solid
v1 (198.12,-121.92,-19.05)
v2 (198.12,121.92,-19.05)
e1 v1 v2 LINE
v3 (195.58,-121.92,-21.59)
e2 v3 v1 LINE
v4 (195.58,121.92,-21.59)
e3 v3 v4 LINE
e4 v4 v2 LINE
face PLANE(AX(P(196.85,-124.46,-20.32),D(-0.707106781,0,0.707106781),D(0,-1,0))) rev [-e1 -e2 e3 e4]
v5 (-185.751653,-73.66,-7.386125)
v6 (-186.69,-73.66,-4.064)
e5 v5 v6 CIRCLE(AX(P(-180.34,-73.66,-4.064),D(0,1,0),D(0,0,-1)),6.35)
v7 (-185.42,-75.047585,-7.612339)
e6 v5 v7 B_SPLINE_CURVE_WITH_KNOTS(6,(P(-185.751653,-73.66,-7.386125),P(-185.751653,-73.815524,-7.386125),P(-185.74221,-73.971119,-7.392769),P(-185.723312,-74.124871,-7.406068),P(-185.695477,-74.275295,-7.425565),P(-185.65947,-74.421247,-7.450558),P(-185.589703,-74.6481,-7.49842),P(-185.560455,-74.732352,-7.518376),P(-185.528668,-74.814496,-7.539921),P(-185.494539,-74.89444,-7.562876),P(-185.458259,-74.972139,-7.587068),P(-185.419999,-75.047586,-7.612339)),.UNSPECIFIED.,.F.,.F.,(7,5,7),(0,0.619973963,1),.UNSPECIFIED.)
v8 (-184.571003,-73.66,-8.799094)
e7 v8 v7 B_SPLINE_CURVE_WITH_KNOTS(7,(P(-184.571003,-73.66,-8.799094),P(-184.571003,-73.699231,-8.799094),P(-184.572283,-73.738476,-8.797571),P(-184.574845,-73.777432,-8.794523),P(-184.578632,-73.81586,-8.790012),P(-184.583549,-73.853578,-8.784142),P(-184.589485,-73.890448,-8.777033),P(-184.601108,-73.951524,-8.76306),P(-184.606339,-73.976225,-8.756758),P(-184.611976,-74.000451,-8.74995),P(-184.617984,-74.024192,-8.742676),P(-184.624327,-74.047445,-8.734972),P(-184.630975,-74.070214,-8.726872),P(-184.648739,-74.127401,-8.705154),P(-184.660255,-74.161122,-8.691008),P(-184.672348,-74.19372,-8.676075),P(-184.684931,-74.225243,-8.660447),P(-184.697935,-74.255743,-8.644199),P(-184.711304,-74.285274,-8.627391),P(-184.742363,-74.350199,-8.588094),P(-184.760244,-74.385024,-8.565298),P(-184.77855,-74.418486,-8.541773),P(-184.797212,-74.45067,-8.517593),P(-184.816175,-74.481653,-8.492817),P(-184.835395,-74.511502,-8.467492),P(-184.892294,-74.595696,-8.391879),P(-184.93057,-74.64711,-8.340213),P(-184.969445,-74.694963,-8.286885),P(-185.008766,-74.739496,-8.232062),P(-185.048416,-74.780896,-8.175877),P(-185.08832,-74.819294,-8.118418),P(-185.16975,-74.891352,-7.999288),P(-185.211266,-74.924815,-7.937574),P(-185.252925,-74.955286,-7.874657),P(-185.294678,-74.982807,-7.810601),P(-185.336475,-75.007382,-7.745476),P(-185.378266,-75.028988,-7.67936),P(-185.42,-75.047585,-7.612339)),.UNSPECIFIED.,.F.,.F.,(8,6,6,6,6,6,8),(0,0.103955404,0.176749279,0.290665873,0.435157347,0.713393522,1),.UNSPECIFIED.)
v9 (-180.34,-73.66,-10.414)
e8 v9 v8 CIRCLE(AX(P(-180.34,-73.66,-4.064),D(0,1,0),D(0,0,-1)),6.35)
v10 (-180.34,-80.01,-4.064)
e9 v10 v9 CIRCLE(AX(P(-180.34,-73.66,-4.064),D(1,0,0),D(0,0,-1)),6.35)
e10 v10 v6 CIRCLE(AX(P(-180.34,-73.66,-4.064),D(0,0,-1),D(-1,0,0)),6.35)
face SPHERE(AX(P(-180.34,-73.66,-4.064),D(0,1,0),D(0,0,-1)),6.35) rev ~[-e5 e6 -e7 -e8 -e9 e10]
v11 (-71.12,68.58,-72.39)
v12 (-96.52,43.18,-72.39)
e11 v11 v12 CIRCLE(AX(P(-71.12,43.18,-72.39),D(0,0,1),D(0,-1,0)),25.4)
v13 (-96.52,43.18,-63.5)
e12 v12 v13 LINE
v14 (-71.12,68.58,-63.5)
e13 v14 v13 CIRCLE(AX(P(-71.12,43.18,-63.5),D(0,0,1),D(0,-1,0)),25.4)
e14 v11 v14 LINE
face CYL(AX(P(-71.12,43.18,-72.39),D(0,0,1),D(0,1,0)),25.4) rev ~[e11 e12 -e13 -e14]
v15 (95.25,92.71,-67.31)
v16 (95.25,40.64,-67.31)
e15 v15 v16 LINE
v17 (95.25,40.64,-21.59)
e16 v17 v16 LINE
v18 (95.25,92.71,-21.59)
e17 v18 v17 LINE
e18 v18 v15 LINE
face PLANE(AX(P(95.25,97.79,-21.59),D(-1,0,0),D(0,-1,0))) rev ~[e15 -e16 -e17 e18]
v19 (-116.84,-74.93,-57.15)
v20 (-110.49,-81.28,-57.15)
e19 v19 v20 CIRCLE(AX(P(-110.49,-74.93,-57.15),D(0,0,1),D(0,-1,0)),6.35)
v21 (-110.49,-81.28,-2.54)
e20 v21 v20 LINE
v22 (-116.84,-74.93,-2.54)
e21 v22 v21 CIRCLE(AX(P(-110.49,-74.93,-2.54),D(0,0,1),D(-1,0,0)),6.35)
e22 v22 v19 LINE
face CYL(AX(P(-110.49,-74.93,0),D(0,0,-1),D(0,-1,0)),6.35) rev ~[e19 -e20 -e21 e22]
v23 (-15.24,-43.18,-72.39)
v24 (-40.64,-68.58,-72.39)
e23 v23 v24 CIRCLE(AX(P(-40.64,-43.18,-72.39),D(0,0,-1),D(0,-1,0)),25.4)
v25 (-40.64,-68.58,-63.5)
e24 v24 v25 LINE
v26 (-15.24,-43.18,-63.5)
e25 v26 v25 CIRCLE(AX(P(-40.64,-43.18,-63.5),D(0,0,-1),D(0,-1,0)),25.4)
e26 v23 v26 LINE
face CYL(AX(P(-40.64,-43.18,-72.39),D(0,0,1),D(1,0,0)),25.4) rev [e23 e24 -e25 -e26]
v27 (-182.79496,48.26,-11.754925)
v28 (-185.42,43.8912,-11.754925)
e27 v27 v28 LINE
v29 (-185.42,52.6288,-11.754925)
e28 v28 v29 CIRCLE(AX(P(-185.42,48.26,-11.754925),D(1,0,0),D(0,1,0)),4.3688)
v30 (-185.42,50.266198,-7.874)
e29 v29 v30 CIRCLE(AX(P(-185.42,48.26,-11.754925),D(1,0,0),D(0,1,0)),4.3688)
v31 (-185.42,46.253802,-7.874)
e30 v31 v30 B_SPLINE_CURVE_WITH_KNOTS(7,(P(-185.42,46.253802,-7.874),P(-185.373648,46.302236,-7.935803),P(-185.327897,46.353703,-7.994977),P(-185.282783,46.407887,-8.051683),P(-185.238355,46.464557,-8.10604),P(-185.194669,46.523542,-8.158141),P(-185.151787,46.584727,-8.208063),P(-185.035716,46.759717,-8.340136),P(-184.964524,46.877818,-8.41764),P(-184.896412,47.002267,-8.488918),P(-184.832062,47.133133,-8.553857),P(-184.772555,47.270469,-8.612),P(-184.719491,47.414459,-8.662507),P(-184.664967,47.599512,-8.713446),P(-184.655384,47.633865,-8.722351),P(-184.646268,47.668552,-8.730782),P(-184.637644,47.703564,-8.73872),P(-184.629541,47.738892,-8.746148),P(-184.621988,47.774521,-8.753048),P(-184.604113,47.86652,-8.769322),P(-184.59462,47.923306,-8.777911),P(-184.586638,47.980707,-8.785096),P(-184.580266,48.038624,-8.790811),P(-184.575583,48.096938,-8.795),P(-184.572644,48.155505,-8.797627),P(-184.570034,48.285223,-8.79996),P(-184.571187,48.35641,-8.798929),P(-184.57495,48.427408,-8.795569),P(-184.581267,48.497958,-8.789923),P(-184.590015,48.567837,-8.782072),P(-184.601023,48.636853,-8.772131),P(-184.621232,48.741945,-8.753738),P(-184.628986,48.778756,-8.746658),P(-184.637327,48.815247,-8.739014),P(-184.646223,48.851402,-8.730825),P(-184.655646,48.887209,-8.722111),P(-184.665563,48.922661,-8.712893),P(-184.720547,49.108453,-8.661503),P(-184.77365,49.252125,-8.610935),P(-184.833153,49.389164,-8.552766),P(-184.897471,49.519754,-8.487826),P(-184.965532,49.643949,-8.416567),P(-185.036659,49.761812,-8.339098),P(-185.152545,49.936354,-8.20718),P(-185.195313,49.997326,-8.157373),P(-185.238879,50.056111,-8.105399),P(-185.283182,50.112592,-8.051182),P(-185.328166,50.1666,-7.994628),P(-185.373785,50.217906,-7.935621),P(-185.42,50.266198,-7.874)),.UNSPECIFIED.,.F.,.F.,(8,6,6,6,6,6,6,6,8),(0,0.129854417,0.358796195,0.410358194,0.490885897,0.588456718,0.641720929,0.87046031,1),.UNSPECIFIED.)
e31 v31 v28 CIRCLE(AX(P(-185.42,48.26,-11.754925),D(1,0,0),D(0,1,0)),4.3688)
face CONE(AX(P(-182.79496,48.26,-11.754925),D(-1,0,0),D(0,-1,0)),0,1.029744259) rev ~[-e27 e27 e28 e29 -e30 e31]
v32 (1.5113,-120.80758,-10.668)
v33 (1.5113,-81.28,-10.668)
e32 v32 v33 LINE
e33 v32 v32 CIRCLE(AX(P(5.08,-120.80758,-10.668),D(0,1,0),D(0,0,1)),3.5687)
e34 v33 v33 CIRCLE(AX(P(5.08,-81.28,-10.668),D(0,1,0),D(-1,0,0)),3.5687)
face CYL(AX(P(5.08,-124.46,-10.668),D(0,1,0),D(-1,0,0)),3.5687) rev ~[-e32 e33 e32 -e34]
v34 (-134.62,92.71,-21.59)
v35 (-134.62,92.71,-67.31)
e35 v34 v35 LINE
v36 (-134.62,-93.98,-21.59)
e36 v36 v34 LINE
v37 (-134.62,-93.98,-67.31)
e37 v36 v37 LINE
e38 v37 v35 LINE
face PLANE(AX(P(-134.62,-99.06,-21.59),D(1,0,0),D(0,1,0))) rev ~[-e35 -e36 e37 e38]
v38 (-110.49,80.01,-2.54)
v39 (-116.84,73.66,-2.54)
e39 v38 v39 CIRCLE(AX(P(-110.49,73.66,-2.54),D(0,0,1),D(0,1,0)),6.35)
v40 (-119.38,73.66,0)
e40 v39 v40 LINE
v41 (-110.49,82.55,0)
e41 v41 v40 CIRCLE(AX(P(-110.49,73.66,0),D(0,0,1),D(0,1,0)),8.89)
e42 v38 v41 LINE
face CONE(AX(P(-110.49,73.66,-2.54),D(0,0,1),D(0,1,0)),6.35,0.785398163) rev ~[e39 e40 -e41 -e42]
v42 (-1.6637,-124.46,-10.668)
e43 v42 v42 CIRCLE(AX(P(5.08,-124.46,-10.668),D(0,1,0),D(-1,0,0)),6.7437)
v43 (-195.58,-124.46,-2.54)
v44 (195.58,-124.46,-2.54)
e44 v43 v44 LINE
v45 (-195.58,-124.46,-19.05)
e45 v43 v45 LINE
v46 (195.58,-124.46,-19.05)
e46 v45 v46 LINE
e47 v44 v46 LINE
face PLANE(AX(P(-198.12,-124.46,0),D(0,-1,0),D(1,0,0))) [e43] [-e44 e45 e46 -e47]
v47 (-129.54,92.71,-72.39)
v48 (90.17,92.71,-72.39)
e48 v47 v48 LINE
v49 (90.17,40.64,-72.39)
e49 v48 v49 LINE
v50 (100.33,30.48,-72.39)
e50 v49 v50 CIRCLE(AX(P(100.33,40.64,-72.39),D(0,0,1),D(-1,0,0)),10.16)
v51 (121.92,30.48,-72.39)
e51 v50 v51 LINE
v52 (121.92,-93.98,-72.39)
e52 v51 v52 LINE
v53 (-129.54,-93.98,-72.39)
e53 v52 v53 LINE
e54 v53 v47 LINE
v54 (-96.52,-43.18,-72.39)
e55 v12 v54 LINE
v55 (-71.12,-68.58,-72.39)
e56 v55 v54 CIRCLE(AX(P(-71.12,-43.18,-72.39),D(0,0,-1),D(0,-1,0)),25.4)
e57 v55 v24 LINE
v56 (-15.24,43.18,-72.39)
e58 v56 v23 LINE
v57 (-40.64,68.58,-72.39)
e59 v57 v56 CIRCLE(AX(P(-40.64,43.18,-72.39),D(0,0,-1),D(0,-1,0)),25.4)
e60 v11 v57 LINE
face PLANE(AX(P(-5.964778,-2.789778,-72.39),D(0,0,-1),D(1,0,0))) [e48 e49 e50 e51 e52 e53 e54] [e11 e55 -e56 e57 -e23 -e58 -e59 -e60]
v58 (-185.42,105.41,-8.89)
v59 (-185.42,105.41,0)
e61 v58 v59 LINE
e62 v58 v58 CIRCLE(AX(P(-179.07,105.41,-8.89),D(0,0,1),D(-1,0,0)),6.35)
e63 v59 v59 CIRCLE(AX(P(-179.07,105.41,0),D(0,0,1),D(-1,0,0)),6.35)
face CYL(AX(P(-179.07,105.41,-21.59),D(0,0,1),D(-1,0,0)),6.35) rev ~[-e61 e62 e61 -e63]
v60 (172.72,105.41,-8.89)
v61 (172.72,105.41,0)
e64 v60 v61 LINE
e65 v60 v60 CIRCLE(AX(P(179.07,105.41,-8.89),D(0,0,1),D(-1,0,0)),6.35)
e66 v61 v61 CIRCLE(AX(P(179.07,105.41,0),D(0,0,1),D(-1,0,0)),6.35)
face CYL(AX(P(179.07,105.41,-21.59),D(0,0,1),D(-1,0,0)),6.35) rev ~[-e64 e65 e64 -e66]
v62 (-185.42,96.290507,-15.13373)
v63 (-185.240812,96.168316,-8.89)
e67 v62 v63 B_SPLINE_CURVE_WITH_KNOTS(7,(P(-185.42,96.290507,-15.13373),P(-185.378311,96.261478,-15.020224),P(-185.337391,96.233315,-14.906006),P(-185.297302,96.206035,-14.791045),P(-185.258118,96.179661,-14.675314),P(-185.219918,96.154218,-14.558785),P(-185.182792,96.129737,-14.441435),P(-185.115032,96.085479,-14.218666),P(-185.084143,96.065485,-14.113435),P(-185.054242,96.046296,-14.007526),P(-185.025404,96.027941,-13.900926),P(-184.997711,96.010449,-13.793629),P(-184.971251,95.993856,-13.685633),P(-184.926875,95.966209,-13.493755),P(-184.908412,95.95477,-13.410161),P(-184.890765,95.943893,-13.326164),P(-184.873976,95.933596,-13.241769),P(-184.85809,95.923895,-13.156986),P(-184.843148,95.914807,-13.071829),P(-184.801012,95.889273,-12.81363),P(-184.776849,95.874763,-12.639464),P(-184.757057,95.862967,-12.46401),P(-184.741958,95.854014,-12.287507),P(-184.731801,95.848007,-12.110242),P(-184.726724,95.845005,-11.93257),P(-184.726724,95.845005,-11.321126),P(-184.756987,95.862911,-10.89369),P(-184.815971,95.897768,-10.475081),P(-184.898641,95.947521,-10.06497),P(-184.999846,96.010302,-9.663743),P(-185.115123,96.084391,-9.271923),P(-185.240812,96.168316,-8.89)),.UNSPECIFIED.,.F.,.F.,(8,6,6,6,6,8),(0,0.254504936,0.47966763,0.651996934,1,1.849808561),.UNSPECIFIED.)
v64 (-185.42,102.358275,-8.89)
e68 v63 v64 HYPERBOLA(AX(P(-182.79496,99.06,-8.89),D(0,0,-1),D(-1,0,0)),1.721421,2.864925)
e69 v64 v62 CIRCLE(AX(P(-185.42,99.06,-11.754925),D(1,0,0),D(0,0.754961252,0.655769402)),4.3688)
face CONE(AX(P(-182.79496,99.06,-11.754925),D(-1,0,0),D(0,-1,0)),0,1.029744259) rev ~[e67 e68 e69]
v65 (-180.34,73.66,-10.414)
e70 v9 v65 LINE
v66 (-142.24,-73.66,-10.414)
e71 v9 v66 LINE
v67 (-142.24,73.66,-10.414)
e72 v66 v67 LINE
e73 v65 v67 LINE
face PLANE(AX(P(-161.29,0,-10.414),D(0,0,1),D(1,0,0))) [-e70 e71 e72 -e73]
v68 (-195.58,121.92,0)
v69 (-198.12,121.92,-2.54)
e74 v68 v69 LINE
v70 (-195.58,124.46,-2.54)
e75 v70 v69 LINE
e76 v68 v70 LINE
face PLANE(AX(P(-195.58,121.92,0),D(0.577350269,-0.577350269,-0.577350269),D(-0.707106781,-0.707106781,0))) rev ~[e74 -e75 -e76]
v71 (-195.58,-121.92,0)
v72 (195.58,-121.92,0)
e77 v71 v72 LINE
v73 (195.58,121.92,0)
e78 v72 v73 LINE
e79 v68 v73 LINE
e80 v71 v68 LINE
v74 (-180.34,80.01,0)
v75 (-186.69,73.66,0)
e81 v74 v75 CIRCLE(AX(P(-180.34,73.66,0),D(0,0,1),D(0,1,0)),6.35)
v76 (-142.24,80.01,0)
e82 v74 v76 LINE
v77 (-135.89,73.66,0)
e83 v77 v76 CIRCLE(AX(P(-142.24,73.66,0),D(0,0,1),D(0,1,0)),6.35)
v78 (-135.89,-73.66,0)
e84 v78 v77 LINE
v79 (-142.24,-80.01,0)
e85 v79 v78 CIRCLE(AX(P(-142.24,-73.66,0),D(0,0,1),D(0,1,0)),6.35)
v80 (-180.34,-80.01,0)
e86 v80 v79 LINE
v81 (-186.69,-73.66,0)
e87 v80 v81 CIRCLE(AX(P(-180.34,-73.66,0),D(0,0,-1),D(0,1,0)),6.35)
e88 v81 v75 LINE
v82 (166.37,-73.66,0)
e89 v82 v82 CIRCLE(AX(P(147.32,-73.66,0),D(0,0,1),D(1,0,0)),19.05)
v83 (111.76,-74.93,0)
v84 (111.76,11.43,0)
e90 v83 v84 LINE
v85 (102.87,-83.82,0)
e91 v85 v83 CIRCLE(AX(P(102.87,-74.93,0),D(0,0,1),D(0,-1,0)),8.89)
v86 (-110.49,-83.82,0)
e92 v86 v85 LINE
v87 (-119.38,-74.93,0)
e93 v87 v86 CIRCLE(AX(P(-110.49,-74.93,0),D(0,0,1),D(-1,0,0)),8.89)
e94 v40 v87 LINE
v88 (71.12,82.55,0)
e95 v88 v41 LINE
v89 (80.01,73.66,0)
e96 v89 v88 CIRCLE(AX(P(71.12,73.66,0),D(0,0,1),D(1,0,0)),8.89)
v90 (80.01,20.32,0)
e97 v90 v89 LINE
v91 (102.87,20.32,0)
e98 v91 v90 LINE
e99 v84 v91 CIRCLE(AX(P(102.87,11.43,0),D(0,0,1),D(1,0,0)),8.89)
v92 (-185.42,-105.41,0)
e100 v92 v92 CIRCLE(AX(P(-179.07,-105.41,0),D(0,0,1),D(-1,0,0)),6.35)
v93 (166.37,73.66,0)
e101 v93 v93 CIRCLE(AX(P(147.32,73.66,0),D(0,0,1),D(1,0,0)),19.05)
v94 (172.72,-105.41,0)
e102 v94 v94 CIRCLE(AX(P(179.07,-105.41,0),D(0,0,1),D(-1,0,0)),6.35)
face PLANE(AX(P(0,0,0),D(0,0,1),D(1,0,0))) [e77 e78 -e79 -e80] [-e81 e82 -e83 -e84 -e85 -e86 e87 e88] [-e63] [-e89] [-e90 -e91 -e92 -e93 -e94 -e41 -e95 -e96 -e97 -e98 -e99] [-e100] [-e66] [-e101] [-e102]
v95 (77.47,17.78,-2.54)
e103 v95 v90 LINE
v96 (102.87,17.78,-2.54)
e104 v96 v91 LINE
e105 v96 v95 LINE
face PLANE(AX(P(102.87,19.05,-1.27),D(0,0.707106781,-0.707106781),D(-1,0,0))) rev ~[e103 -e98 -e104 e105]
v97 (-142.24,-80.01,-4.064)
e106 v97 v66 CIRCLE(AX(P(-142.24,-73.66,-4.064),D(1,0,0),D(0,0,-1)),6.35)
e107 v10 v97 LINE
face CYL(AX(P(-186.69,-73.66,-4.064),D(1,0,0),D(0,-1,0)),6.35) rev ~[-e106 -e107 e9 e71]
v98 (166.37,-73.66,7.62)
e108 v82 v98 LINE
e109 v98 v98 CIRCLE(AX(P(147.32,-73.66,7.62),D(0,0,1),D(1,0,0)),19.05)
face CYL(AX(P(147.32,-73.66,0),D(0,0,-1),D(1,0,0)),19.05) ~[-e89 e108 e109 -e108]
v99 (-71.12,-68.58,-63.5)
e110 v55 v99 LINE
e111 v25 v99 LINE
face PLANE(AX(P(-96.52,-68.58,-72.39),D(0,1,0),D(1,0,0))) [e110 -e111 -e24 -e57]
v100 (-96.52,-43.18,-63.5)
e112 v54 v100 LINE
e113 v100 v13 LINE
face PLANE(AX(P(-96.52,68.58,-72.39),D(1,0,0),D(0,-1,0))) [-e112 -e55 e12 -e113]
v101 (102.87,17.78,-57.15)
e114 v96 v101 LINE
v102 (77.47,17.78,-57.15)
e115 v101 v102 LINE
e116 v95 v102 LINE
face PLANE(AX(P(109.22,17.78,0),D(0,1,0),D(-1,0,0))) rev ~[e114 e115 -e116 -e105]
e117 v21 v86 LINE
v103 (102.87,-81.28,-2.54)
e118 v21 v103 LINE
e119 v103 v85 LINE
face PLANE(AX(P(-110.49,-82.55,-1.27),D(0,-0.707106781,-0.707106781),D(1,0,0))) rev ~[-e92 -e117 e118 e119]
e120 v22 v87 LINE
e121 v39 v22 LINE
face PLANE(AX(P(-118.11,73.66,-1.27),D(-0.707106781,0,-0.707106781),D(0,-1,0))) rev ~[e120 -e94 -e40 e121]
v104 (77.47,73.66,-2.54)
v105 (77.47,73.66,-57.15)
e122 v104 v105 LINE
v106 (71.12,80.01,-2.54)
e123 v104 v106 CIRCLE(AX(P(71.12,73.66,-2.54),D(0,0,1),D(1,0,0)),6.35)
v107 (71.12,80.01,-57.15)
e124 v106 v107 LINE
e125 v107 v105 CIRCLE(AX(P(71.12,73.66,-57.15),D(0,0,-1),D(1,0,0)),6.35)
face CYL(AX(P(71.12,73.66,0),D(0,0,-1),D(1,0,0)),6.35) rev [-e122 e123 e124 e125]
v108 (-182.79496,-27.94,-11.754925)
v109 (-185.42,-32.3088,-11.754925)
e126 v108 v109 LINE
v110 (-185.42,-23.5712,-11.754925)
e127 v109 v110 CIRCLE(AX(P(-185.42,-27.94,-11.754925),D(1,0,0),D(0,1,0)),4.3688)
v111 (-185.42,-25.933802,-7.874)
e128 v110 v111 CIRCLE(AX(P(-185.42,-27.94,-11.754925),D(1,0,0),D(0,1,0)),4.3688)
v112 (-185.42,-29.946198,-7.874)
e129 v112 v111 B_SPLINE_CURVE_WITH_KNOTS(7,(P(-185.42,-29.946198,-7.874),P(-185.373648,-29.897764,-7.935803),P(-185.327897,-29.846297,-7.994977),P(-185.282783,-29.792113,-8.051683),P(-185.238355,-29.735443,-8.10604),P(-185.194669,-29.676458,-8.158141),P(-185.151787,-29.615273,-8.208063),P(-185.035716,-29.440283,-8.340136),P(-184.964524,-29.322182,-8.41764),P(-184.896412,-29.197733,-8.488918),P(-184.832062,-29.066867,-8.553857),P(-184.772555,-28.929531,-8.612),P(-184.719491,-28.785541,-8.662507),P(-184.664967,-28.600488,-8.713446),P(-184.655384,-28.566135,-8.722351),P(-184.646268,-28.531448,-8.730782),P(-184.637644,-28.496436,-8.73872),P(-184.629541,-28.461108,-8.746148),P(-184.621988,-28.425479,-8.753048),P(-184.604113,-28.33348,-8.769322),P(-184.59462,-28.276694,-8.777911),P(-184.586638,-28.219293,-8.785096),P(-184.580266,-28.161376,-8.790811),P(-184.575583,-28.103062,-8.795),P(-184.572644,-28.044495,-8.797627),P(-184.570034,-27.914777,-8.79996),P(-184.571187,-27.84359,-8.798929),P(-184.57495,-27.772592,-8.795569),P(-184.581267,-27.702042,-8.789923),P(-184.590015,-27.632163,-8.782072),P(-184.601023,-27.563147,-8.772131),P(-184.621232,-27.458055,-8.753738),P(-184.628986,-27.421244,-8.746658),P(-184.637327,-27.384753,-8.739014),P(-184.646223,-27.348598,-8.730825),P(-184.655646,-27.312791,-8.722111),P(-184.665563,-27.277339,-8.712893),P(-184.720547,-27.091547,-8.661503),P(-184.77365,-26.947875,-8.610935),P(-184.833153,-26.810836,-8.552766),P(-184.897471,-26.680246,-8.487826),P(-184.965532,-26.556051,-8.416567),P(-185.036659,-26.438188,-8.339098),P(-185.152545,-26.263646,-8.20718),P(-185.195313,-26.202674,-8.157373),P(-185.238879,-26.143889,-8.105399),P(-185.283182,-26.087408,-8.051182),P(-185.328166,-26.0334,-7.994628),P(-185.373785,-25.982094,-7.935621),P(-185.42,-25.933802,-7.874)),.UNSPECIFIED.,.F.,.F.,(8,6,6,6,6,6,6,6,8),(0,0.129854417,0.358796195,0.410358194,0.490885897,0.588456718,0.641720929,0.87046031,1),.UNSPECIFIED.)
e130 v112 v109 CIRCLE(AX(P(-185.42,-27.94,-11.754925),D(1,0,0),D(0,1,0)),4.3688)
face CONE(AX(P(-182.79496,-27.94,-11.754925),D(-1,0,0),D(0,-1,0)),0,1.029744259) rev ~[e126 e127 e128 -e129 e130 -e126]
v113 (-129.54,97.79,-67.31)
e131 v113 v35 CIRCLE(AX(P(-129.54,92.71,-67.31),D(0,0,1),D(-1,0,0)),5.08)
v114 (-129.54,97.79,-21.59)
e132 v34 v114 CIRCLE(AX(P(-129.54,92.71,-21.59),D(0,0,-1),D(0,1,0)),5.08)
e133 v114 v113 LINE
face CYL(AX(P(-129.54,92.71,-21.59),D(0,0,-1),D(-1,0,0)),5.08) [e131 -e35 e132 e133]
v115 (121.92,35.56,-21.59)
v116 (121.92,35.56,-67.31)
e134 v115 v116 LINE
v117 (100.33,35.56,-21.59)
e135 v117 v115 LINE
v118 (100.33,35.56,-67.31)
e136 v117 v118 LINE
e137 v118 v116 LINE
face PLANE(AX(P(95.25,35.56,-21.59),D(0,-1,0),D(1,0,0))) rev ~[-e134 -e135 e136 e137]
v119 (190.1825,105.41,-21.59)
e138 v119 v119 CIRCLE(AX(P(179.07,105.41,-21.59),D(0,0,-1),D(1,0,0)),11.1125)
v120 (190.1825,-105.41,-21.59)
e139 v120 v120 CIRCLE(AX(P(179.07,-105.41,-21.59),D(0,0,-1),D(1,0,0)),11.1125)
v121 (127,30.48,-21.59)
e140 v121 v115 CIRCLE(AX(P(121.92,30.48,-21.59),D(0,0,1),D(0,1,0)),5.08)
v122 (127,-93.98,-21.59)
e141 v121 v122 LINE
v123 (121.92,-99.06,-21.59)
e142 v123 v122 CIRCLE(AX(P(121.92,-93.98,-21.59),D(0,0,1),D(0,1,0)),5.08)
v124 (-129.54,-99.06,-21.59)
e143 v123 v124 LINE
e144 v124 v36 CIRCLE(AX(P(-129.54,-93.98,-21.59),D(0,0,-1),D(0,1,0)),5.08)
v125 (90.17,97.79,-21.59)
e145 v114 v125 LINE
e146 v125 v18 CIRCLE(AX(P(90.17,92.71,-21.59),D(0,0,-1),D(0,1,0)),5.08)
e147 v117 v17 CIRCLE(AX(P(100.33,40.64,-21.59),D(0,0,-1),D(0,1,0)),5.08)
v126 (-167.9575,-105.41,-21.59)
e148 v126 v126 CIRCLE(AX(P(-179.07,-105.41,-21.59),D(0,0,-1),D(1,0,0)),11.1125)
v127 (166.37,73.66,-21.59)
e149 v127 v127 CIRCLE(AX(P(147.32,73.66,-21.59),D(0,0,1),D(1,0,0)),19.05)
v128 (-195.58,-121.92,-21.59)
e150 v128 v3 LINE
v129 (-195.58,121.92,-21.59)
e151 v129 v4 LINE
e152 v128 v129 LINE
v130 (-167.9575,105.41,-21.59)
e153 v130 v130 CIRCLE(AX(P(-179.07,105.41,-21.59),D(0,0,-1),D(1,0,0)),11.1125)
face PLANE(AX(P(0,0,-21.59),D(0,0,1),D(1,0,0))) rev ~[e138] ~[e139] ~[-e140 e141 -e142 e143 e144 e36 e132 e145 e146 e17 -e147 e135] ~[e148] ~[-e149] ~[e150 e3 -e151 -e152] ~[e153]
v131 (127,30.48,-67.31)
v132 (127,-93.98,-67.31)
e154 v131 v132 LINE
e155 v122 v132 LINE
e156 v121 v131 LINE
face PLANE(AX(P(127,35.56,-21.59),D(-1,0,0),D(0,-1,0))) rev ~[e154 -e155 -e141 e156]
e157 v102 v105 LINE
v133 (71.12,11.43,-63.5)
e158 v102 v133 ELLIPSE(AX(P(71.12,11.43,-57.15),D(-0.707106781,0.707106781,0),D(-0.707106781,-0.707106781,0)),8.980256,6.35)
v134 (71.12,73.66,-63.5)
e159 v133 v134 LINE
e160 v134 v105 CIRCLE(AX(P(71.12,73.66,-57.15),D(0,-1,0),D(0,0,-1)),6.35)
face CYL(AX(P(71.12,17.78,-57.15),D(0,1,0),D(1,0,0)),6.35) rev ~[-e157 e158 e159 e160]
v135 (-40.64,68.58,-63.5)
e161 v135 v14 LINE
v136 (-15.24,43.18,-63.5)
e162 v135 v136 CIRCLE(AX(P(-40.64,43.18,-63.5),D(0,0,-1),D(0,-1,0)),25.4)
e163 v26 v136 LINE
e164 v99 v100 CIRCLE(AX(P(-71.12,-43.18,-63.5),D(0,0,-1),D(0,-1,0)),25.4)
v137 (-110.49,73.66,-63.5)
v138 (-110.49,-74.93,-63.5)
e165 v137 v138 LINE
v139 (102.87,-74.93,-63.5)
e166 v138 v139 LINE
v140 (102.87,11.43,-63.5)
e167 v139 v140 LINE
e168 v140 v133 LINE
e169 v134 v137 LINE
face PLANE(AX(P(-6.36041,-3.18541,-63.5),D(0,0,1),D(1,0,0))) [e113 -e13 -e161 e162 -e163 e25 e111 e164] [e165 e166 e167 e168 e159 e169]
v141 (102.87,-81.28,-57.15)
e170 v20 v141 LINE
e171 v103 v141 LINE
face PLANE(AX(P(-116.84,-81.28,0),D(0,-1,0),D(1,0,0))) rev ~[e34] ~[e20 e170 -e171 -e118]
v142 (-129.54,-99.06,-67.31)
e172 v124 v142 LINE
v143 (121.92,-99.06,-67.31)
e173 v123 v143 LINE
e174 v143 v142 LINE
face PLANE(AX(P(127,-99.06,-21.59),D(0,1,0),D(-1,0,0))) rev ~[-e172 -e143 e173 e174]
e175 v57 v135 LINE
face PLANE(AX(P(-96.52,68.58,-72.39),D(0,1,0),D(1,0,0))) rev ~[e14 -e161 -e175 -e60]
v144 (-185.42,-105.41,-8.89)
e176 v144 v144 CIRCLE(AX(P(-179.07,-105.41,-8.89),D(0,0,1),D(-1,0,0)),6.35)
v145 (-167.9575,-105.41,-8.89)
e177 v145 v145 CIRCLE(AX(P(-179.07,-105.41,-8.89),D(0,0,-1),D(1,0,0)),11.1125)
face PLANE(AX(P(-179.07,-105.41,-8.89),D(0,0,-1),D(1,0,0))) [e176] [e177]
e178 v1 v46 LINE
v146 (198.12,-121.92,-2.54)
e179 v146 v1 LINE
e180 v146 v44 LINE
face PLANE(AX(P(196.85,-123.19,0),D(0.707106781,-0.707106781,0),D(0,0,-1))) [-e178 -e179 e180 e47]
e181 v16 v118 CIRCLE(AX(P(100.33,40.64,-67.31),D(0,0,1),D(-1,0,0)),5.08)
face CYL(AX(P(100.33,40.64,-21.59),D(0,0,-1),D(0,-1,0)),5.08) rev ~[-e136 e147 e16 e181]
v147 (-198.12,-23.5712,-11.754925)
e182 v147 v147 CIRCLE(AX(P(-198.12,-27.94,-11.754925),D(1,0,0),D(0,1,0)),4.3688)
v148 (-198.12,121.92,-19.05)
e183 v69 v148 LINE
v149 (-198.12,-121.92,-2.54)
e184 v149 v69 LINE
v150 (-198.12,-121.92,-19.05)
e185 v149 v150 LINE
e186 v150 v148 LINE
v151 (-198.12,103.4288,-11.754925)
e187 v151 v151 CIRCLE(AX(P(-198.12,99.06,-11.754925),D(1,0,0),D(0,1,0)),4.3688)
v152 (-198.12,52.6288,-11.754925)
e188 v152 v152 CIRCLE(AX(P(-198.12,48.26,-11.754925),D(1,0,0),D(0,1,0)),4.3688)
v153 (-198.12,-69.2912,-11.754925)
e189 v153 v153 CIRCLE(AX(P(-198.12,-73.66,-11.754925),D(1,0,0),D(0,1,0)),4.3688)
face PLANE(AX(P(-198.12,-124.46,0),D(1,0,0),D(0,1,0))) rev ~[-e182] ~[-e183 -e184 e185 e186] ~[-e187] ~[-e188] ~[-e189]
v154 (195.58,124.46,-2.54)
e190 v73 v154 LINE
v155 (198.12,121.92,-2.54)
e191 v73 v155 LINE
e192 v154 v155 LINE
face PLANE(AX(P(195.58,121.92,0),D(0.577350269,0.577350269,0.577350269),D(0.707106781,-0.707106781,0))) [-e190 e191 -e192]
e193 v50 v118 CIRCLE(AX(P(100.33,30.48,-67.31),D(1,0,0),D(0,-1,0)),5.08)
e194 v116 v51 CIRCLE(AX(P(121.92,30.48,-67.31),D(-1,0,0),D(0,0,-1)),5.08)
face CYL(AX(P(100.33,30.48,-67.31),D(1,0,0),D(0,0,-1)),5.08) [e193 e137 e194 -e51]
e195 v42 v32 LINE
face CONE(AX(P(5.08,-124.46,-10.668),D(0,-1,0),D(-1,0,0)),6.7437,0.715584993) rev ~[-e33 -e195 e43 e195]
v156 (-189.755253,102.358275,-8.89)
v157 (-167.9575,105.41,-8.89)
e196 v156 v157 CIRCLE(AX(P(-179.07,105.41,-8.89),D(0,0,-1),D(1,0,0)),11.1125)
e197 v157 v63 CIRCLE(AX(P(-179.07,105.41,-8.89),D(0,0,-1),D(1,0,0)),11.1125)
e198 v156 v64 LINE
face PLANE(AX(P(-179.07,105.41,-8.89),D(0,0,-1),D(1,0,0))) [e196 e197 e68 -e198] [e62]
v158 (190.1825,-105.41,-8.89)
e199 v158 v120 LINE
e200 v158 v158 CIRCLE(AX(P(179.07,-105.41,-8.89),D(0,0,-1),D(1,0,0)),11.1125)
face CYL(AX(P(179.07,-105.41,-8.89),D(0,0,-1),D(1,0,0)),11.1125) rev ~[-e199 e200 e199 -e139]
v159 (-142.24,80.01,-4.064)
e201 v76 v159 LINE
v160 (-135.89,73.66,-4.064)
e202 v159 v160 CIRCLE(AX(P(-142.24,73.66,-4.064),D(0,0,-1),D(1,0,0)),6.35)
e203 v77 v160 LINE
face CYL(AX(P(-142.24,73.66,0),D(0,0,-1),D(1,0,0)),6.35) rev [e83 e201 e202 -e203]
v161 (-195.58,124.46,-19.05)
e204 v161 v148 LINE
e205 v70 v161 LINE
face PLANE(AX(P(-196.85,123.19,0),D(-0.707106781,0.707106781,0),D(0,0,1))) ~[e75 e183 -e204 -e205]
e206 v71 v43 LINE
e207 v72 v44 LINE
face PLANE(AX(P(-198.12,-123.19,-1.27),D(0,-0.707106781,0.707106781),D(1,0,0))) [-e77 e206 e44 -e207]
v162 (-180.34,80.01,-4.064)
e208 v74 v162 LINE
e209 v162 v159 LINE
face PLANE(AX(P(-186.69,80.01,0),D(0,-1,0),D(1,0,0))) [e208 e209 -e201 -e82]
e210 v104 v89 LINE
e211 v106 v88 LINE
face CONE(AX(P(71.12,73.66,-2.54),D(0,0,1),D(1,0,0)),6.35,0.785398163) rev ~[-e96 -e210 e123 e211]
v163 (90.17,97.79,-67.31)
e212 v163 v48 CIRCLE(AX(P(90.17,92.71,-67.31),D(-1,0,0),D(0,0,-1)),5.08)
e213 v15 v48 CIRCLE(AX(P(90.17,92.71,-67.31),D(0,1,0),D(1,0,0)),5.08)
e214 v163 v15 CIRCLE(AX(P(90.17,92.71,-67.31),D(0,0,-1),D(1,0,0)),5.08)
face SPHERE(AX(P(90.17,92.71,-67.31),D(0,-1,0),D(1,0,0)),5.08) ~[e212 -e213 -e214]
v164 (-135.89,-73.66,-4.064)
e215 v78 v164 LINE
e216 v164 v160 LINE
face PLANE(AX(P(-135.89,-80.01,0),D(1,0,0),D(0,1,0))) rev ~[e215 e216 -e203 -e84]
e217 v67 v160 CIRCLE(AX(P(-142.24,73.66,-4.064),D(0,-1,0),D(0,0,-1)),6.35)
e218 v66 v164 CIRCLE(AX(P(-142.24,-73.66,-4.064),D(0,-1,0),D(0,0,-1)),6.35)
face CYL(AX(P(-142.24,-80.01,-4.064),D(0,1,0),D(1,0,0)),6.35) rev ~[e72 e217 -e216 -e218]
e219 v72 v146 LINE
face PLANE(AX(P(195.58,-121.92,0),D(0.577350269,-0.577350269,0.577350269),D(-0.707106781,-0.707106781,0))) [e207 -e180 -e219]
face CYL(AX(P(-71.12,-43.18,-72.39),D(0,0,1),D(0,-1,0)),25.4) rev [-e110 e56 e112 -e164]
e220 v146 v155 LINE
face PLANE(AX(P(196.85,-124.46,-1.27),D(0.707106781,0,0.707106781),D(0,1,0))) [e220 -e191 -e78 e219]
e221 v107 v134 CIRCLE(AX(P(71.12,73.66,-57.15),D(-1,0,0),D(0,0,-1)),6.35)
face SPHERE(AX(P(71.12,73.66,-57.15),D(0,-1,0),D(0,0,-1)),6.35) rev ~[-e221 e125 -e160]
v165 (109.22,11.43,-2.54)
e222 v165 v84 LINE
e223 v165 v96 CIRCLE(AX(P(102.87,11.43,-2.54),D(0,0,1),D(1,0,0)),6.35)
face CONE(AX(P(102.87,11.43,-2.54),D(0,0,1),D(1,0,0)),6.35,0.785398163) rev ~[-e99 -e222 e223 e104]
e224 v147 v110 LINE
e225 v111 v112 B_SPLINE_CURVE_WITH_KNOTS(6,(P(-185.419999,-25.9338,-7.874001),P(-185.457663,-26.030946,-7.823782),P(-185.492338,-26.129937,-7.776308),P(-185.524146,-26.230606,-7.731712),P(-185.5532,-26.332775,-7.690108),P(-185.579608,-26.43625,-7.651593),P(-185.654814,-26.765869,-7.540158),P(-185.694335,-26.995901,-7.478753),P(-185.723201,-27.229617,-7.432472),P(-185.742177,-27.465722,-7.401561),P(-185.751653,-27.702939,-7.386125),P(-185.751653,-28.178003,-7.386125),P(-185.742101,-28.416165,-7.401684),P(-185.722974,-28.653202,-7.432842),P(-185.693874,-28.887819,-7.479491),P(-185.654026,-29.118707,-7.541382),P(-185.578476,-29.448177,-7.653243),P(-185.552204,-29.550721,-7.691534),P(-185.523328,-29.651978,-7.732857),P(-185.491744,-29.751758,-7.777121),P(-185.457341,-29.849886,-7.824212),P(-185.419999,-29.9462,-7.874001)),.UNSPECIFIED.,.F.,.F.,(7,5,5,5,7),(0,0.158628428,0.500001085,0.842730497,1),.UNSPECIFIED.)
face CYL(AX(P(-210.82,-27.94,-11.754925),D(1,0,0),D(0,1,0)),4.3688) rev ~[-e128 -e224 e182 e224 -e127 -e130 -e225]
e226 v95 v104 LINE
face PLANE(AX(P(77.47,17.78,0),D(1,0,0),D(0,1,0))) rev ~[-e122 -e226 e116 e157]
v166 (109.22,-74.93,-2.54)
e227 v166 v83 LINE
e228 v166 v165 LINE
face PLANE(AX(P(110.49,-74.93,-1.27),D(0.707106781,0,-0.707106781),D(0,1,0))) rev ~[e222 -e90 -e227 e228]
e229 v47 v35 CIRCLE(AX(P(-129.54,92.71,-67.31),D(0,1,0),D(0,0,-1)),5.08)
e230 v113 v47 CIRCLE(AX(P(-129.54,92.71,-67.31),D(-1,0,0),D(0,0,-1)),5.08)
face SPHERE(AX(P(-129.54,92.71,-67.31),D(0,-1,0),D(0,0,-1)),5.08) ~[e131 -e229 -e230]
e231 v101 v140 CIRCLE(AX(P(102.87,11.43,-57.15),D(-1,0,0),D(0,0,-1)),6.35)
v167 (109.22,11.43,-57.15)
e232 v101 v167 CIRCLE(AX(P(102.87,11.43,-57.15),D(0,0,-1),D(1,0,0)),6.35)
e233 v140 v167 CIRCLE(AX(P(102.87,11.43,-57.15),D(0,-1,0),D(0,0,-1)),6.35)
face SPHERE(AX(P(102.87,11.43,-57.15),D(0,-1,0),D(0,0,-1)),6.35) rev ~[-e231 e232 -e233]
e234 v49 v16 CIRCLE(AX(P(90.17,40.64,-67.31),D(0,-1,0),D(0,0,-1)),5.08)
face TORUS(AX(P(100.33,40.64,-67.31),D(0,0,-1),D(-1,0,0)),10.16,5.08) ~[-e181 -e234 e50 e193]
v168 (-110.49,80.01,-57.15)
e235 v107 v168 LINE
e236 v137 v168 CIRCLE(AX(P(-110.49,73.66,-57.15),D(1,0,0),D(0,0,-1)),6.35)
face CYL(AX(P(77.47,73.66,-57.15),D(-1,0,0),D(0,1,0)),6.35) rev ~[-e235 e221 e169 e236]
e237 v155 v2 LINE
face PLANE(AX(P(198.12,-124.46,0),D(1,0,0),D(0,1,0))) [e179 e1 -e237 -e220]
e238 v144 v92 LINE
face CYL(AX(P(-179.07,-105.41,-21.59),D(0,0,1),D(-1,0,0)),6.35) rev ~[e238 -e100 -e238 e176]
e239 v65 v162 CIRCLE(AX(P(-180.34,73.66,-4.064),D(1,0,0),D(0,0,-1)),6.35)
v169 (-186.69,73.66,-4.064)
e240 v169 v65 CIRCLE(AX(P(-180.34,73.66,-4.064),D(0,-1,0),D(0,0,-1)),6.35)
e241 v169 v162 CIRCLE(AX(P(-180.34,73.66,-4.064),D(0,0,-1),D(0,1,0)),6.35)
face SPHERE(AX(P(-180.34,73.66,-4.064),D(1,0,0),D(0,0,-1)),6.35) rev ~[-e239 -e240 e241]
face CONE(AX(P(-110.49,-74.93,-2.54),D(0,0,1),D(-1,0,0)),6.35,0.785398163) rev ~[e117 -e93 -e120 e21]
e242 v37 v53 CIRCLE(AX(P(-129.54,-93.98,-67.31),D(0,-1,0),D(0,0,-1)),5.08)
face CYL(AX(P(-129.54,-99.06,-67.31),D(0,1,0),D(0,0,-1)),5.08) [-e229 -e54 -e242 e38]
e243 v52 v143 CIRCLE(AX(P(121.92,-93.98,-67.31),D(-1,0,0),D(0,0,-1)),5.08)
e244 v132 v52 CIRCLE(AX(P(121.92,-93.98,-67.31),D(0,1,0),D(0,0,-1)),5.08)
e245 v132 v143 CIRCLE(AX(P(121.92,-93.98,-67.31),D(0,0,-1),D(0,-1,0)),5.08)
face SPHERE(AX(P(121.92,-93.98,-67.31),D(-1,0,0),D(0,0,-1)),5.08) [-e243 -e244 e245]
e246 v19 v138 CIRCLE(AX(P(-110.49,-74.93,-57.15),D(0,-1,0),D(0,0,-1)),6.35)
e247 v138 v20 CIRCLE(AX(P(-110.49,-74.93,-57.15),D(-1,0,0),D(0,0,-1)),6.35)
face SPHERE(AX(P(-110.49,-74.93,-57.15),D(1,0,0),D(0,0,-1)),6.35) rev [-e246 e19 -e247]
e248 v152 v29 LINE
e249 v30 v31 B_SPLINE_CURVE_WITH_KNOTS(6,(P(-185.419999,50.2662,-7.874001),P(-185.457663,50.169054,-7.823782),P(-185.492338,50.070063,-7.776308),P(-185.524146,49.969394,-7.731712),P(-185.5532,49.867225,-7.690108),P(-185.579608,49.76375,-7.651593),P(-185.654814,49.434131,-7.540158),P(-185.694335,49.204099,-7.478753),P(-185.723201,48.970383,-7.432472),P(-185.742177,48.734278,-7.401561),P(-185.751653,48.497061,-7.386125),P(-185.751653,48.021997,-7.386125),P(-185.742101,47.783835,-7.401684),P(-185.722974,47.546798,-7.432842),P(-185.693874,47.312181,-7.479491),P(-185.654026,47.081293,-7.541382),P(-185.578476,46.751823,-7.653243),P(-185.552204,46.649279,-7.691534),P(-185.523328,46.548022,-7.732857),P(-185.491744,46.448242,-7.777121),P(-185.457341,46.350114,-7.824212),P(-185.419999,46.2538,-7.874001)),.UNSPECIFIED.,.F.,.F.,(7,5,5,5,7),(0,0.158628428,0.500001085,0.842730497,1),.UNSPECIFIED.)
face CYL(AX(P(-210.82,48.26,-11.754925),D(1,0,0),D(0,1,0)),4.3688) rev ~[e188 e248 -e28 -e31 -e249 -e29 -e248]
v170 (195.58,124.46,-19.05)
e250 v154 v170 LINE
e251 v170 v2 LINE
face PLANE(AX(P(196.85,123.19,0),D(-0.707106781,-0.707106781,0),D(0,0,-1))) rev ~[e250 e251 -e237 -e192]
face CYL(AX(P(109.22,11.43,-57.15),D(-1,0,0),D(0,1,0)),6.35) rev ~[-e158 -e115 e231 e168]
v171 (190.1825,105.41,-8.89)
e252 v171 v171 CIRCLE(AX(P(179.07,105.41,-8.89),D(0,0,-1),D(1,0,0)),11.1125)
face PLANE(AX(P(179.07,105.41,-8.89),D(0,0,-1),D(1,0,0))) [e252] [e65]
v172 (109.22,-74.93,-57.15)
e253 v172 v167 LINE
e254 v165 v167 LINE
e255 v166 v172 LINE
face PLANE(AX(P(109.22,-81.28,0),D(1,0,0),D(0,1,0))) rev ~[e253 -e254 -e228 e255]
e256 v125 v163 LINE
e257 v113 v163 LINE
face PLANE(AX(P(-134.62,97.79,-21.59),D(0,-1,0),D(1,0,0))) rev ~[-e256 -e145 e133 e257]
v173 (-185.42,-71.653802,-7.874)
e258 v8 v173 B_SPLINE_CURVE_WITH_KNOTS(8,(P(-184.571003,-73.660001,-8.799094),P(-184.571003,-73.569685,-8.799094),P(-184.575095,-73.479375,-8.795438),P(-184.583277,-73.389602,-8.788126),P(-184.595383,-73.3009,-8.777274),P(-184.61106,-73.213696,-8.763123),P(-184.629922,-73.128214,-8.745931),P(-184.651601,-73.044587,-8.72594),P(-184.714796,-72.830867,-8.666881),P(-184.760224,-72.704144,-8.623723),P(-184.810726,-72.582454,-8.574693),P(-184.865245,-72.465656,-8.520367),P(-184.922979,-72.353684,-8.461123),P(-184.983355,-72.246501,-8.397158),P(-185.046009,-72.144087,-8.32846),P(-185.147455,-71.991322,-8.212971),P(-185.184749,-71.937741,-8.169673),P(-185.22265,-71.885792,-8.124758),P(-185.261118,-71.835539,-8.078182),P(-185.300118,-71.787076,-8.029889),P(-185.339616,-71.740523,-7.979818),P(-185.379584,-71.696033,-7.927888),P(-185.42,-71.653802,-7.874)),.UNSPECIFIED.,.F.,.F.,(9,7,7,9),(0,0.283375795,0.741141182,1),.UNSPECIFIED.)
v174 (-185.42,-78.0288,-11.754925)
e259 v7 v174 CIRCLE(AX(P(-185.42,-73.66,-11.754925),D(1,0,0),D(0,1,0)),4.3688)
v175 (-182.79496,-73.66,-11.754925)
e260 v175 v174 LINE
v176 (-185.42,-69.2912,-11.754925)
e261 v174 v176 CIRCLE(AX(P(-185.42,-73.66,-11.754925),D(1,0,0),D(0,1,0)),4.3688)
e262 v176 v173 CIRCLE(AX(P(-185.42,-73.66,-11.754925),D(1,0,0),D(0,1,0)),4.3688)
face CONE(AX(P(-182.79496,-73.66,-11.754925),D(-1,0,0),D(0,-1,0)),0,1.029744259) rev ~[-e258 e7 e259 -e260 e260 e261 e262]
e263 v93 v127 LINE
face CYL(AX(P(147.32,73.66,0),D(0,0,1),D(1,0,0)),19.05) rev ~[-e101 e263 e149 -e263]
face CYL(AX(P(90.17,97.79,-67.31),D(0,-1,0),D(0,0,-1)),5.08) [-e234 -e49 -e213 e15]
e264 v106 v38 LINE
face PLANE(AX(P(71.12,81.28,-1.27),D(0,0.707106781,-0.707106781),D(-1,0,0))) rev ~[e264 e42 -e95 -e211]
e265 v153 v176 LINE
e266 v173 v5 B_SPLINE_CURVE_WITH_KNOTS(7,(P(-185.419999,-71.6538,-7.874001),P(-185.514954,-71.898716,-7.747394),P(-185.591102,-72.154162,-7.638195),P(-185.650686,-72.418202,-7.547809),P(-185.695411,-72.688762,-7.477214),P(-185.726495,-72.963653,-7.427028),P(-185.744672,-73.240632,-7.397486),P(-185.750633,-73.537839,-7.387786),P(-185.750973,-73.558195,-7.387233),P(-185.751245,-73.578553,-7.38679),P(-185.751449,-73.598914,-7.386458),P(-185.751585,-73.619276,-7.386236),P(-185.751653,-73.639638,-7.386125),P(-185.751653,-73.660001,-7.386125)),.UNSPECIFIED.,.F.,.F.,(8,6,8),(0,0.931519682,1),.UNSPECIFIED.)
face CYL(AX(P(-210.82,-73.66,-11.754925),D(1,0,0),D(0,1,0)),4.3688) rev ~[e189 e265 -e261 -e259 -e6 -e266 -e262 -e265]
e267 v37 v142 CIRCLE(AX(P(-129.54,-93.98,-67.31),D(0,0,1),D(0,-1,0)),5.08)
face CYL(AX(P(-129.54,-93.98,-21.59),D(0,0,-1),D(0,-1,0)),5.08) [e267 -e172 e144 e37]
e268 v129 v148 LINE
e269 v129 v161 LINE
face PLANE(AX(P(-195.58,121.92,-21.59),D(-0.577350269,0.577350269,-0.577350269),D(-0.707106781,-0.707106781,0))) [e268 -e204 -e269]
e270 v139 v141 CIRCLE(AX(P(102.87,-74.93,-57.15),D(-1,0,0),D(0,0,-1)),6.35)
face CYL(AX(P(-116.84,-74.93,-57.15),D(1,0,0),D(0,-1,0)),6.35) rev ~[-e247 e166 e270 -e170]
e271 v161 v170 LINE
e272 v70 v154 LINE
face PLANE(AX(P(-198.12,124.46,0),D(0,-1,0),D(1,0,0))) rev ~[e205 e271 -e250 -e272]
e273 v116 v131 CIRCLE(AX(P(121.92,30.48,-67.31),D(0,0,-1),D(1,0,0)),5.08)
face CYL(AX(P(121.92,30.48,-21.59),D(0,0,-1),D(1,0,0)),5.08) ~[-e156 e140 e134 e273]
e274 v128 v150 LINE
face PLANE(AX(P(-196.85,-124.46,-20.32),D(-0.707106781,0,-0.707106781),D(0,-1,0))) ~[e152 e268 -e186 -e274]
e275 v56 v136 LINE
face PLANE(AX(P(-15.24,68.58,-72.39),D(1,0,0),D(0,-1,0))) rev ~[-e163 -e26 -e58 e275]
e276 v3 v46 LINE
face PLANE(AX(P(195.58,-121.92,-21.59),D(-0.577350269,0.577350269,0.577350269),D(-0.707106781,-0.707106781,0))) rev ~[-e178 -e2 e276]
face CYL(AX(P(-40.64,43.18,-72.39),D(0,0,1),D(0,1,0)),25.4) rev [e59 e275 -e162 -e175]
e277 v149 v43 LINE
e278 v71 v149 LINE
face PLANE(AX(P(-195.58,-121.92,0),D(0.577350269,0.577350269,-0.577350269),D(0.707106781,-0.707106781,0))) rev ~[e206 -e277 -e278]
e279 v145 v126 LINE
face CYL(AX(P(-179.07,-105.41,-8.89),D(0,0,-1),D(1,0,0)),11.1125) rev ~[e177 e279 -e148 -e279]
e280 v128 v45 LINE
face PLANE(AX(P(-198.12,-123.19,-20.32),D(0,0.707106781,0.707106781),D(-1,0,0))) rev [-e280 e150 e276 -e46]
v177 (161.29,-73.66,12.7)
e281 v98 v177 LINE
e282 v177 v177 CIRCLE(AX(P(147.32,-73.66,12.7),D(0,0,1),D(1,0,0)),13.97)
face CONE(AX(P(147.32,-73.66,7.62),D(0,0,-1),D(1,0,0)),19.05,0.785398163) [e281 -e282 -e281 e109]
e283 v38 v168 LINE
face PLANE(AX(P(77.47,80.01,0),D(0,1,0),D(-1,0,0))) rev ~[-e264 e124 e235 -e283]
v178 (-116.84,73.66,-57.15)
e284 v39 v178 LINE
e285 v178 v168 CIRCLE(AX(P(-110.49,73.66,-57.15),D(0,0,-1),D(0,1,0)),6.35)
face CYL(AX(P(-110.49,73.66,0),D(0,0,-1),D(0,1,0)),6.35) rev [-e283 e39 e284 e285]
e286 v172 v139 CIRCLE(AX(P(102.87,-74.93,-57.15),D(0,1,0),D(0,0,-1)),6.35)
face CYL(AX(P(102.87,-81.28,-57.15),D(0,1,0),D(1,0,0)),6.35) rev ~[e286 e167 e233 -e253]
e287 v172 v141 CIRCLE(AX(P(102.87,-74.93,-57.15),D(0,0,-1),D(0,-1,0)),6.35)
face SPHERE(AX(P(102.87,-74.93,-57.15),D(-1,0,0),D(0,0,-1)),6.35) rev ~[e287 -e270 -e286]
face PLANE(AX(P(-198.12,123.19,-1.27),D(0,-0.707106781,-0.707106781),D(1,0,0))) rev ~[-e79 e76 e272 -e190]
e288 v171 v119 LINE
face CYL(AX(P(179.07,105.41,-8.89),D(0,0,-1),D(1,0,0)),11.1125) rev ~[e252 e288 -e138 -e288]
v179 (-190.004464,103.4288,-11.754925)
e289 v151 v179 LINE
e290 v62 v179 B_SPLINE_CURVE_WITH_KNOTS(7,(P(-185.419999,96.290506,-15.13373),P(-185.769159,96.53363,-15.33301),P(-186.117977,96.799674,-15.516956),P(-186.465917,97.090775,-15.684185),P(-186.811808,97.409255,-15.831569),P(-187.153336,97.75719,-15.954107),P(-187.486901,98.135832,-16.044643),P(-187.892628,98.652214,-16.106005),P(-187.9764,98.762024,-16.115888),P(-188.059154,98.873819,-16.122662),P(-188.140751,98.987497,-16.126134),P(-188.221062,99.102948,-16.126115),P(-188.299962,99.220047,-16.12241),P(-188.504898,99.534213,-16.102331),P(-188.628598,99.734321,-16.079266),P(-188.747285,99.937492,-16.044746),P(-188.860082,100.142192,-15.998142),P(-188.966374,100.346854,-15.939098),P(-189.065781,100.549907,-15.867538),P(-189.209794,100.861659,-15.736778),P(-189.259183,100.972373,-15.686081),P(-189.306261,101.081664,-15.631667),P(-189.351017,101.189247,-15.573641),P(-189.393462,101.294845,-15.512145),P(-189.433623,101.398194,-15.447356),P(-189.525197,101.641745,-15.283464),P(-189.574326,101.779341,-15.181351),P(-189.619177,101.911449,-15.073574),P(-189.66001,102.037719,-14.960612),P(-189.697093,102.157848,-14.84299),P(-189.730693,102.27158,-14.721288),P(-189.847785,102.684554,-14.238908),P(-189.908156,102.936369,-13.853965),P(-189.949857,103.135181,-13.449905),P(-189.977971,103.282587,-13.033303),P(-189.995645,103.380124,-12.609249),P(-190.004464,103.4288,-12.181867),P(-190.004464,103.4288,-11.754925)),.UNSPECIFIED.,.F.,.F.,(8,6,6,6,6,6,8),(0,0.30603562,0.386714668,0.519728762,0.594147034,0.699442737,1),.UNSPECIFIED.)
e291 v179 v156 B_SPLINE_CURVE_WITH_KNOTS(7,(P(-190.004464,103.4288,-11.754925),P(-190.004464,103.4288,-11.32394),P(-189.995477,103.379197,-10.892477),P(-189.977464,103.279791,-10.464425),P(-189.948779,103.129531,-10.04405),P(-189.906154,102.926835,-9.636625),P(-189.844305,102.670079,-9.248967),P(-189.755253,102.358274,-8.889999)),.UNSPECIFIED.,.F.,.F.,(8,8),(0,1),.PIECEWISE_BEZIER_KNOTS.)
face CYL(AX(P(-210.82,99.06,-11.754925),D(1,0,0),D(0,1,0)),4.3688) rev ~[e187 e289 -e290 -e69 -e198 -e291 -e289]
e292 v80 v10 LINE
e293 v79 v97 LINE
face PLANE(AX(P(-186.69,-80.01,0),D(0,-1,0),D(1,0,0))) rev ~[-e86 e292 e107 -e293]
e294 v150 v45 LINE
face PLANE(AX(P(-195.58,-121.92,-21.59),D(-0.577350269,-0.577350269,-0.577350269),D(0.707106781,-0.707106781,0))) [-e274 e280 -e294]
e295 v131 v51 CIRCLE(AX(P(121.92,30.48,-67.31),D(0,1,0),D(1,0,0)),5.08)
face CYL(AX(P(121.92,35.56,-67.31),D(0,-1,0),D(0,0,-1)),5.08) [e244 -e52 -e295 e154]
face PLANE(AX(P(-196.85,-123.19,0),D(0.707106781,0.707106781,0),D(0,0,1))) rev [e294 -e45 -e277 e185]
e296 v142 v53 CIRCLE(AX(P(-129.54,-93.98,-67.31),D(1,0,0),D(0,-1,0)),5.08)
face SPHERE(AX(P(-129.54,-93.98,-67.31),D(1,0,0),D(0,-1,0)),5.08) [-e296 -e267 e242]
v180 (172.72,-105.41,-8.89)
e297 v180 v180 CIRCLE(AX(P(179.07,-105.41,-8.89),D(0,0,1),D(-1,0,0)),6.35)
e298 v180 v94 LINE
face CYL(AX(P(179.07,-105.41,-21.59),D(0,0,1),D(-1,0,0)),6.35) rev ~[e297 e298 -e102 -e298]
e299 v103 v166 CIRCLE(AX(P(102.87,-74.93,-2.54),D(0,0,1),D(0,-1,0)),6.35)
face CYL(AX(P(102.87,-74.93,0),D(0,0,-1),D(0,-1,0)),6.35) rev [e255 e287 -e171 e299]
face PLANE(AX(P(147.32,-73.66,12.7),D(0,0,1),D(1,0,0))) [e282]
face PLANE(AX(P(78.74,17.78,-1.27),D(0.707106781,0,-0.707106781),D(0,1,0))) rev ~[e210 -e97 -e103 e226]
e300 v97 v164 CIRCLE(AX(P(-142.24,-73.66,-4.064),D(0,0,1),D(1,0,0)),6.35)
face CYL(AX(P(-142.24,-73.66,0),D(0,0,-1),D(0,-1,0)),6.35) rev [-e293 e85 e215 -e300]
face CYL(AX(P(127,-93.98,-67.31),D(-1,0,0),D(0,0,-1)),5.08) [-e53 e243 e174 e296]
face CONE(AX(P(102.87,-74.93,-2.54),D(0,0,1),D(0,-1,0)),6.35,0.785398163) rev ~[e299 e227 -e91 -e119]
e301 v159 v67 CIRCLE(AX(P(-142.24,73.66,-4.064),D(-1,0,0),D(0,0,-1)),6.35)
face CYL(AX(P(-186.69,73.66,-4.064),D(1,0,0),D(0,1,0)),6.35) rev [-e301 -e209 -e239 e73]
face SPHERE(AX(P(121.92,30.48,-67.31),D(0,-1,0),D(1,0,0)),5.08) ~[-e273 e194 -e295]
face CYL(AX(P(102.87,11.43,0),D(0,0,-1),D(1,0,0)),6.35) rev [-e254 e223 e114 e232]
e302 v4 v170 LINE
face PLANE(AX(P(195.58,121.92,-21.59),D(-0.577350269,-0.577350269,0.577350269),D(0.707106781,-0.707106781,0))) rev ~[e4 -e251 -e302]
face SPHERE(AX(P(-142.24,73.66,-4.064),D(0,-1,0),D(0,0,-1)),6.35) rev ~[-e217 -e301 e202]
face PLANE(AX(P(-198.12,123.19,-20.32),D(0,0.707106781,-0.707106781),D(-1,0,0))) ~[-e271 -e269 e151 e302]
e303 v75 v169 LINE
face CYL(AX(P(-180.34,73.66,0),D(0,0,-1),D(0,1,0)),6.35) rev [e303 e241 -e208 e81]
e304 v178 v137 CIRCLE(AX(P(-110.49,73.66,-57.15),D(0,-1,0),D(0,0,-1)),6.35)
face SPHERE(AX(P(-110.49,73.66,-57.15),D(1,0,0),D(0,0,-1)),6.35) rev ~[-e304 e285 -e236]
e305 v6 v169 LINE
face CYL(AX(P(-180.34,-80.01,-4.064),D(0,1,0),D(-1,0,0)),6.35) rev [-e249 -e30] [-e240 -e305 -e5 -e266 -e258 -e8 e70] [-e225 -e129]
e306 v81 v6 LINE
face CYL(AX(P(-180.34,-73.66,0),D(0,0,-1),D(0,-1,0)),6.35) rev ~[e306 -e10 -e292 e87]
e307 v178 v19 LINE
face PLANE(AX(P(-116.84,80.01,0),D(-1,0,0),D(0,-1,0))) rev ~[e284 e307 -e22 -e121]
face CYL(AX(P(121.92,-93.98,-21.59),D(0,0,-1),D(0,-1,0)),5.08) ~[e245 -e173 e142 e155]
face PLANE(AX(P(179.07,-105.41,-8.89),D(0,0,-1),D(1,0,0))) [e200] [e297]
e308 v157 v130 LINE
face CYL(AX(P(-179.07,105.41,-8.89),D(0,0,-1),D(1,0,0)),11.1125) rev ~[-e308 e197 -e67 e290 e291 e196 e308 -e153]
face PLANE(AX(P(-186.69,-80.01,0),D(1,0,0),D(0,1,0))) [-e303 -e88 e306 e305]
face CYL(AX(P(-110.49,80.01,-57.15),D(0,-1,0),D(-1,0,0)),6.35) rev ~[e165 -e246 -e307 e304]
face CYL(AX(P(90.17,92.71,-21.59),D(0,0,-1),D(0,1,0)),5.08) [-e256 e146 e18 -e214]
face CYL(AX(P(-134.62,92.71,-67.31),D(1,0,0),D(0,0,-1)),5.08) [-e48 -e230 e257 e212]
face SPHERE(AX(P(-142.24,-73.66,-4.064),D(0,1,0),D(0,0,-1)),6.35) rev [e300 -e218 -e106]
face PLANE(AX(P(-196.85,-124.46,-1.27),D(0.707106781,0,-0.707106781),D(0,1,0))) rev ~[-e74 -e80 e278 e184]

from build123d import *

# Parameters (mm, degrees)
F0_W            = 396.24
F0_H            = 248.92
F1_DEPTH        = 21.59
F3_DEPTH        = 50.8
F5_DEPTH        = 63.5
F6_R            = 6.35
F7_R            = 5.08
F8_W            = 81.28
F8_H            = 137.16
F9_DEPTH        = 72.391
F10_W           = 50.8
F10_H           = 160.02
F11_DEPTH       = 10.414
F12_R           = 6.35
F13_R           = 19.05
F14_DEPTH       = 12.7
F15_SIZE        = 5.08
F17_D           = 7.1374
F17_DEPTH       = 127
F17_CSINK_D     = 13.4874
F17_CSINK_ANGLE = 82
F17_TIP         = 2.1442912911
F18_R           = 5.08
F20_D           = 12.7
F20_CBORE_D     = 22.225
F20_CBORE_DEPTH = 12.7
F21_R           = 19.05
F22_DEPTH       = 72.391
F24_SIZE        = 2.54
F25_R           = 25.4
F26_D           = 8.7376
F26_DEPTH       = 12.7
F26_TIP         = 2.6250398724


with BuildPart() as f1:
    # F0 (on Top) → F1 (new body)
    with BuildSketch(Plane.XY):
        Rectangle(F0_W, F0_H)
    extrude(amount=-F1_DEPTH)

    # F2 (on face) → F3 (join)
    with BuildSketch(Plane(origin=(0, 0, -21.59), x_dir=(1, 0, 0), z_dir=(0, 0, -1))):
        Polygon((127, 99.06), (-134.62, 99.06), (-134.62, -97.79), (95.25, -97.79), (95.25, -35.56), (127, -35.56), align=None)
    extrude(amount=F3_DEPTH)

    # F4 (on face) → F5 (cut)
    with BuildSketch(Plane.XY):
        Polygon((-116.84, -81.28), (109.22, -81.28), (109.22, 17.78), (77.47, 17.78), (77.47, 80.01), (-116.84, 80.01), align=None)
    extrude(amount=-F5_DEPTH, mode=Mode.SUBTRACT)

    # F6
    f6_edges = [f1.edges().sort_by_distance(p)[0] for p in [
        (-3.81, -81.28, -63.5),
        (109.22, -31.75, -63.5),
        (93.345, 17.78, -63.5),
        (77.47, 48.895, -63.5),
        (-19.685, 80.01, -63.5),
        (-116.84, -0.635, -63.5),
        (109.22, -81.28, -31.75),
        (-116.84, -81.28, -31.75),
        (-116.84, 80.01, -31.75),
        (109.22, 17.78, -31.75),
        (77.47, 80.01, -31.75),
    ]]
    fillet(f6_edges, radius=F6_R)

    # F7
    f7_edges = [f1.edges().sort_by_distance(p)[0] for p in [
        (95.25, 35.56, -46.99),
    ]]
    fillet(f7_edges, radius=F7_R)

    # F8 (on face) → F9 (cut, through all)
    with BuildSketch(Plane(origin=(0, 0, -72.39), x_dir=(1, 0, 0), z_dir=(0, 0, -1))):
        with Locations((-55.88, 0)):
            Rectangle(F8_W, F8_H)
    extrude(amount=-F9_DEPTH, mode=Mode.SUBTRACT)

    # F10 (on face) → F11 (cut)
    with BuildSketch(Plane.XY):
        with Locations((-161.29, 0)):
            Rectangle(F10_W, F10_H)
    extrude(amount=-F11_DEPTH, mode=Mode.SUBTRACT)

    # F12
    f12_edges = [f1.edges().sort_by_distance(p)[0] for p in [
        (-135.89, 0, -10.414),
        (-161.29, 80.01, -10.414),
        (-186.69, 0, -10.414),
        (-161.29, -80.01, -10.414),
        (-186.69, 80.01, -5.207),
        (-135.89, 80.01, -5.207),
        (-135.89, -80.01, -5.207),
        (-186.69, -80.01, -5.207),
    ]]
    fillet(f12_edges, radius=F12_R)

    # F13 (on face) → F14 (join)
    with BuildSketch(Plane.XY):
        with Locations((147.32, -73.66)):
            Circle(F13_R)
    extrude(amount=F14_DEPTH)

    # F15
    f15_edges = [f1.edges().sort_by_distance(p)[0] for p in [
        (128.27, -73.66, 12.7),
    ]]
    chamfer(f15_edges, length=F15_SIZE)

    # F17
    with Locations(Plane.XZ.offset(124.46)):
        with Locations((5.08, -10.668)):
            CounterSinkHole(F17_D / 2, F17_CSINK_D / 2, depth=F17_DEPTH, counter_sink_angle=F17_CSINK_ANGLE)
            with Locations((0, 0, -(F17_DEPTH + F17_TIP / 2))):  # 118° drill point
                Cone(0, F17_D / 2, F17_TIP, mode=Mode.SUBTRACT)

    # F18
    f18_edges = [f1.edges().sort_by_distance(p)[0] for p in [
        (-3.81, -99.06, -72.39),
        (-134.62, -99.06, -46.99),
        (-134.62, -0.635, -72.39),
        (127, -31.75, -72.39),
        (127, -99.06, -46.99),
        (127, 35.56, -46.99),
        (113.665, 35.56, -72.39),
        (95.25, 97.79, -46.99),
        (-19.685, 97.79, -72.39),
        (-134.62, 97.79, -46.99),
    ]]
    fillet(f18_edges, radius=F18_R)

    # F20 (through all)
    with Locations(Plane(origin=(0, 0, -21.59), x_dir=(1, 0, 0), z_dir=(0, 0, -1))):
        with Locations((-179.07, 105.41), (179.07, 105.41), (179.07, -105.41), (-179.07, -105.41)):
            CounterBoreHole(F20_D / 2, F20_CBORE_D / 2, F20_CBORE_DEPTH)

    # F21 (on face) → F22 (cut, through all)
    with BuildSketch(Plane.XY):
        with Locations((147.32, 73.66)):
            Circle(F21_R)
    extrude(amount=-F22_DEPTH, mode=Mode.SUBTRACT)

    # F24
    f24_edges = [f1.edges().sort_by_distance(p)[0] for p in [
        (198.12, 124.46, -10.795),
        (-198.12, 124.46, -10.795),
        (0, 124.46, 0),
        (0, 124.46, -21.59),
        (198.12, -124.46, -10.795),
        (198.12, 0, 0),
        (198.12, 0, -21.59),
        (-198.12, -124.46, -10.795),
        (-198.12, 0, 0),
        (-198.12, 0, -21.59),
        (90.17, 17.78, 0),
        (0, -124.46, -21.59),
        (0, -124.46, 0),
    ]]
    chamfer(f24_edges, length=F24_SIZE)

    # F25
    f25_edges = [f1.edges().sort_by_distance(p)[0] for p in [
        (-15.24, -68.58, -67.945),
        (-15.24, 68.58, -67.945),
        (-96.52, 68.58, -67.945),
        (-96.52, -68.58, -67.945),
    ]]
    fillet(f25_edges, radius=F25_R)

    # F26
    with Locations(Plane(origin=(-198.12, 0, 0), x_dir=(0, -1, 0), z_dir=(-1, 0, 0))):
        with Locations((-48.26, -11.7549253628), (27.94, -11.7549253628), (73.66, -11.7549253628), (-99.06, -11.7549253628)):
            Hole(F26_D / 2, depth=F26_DEPTH)
            with Locations((0, 0, -(F26_DEPTH + F26_TIP / 2))):  # 118° drill point
                Cone(0, F26_D / 2, F26_TIP, mode=Mode.SUBTRACT)


solid = f1.part
